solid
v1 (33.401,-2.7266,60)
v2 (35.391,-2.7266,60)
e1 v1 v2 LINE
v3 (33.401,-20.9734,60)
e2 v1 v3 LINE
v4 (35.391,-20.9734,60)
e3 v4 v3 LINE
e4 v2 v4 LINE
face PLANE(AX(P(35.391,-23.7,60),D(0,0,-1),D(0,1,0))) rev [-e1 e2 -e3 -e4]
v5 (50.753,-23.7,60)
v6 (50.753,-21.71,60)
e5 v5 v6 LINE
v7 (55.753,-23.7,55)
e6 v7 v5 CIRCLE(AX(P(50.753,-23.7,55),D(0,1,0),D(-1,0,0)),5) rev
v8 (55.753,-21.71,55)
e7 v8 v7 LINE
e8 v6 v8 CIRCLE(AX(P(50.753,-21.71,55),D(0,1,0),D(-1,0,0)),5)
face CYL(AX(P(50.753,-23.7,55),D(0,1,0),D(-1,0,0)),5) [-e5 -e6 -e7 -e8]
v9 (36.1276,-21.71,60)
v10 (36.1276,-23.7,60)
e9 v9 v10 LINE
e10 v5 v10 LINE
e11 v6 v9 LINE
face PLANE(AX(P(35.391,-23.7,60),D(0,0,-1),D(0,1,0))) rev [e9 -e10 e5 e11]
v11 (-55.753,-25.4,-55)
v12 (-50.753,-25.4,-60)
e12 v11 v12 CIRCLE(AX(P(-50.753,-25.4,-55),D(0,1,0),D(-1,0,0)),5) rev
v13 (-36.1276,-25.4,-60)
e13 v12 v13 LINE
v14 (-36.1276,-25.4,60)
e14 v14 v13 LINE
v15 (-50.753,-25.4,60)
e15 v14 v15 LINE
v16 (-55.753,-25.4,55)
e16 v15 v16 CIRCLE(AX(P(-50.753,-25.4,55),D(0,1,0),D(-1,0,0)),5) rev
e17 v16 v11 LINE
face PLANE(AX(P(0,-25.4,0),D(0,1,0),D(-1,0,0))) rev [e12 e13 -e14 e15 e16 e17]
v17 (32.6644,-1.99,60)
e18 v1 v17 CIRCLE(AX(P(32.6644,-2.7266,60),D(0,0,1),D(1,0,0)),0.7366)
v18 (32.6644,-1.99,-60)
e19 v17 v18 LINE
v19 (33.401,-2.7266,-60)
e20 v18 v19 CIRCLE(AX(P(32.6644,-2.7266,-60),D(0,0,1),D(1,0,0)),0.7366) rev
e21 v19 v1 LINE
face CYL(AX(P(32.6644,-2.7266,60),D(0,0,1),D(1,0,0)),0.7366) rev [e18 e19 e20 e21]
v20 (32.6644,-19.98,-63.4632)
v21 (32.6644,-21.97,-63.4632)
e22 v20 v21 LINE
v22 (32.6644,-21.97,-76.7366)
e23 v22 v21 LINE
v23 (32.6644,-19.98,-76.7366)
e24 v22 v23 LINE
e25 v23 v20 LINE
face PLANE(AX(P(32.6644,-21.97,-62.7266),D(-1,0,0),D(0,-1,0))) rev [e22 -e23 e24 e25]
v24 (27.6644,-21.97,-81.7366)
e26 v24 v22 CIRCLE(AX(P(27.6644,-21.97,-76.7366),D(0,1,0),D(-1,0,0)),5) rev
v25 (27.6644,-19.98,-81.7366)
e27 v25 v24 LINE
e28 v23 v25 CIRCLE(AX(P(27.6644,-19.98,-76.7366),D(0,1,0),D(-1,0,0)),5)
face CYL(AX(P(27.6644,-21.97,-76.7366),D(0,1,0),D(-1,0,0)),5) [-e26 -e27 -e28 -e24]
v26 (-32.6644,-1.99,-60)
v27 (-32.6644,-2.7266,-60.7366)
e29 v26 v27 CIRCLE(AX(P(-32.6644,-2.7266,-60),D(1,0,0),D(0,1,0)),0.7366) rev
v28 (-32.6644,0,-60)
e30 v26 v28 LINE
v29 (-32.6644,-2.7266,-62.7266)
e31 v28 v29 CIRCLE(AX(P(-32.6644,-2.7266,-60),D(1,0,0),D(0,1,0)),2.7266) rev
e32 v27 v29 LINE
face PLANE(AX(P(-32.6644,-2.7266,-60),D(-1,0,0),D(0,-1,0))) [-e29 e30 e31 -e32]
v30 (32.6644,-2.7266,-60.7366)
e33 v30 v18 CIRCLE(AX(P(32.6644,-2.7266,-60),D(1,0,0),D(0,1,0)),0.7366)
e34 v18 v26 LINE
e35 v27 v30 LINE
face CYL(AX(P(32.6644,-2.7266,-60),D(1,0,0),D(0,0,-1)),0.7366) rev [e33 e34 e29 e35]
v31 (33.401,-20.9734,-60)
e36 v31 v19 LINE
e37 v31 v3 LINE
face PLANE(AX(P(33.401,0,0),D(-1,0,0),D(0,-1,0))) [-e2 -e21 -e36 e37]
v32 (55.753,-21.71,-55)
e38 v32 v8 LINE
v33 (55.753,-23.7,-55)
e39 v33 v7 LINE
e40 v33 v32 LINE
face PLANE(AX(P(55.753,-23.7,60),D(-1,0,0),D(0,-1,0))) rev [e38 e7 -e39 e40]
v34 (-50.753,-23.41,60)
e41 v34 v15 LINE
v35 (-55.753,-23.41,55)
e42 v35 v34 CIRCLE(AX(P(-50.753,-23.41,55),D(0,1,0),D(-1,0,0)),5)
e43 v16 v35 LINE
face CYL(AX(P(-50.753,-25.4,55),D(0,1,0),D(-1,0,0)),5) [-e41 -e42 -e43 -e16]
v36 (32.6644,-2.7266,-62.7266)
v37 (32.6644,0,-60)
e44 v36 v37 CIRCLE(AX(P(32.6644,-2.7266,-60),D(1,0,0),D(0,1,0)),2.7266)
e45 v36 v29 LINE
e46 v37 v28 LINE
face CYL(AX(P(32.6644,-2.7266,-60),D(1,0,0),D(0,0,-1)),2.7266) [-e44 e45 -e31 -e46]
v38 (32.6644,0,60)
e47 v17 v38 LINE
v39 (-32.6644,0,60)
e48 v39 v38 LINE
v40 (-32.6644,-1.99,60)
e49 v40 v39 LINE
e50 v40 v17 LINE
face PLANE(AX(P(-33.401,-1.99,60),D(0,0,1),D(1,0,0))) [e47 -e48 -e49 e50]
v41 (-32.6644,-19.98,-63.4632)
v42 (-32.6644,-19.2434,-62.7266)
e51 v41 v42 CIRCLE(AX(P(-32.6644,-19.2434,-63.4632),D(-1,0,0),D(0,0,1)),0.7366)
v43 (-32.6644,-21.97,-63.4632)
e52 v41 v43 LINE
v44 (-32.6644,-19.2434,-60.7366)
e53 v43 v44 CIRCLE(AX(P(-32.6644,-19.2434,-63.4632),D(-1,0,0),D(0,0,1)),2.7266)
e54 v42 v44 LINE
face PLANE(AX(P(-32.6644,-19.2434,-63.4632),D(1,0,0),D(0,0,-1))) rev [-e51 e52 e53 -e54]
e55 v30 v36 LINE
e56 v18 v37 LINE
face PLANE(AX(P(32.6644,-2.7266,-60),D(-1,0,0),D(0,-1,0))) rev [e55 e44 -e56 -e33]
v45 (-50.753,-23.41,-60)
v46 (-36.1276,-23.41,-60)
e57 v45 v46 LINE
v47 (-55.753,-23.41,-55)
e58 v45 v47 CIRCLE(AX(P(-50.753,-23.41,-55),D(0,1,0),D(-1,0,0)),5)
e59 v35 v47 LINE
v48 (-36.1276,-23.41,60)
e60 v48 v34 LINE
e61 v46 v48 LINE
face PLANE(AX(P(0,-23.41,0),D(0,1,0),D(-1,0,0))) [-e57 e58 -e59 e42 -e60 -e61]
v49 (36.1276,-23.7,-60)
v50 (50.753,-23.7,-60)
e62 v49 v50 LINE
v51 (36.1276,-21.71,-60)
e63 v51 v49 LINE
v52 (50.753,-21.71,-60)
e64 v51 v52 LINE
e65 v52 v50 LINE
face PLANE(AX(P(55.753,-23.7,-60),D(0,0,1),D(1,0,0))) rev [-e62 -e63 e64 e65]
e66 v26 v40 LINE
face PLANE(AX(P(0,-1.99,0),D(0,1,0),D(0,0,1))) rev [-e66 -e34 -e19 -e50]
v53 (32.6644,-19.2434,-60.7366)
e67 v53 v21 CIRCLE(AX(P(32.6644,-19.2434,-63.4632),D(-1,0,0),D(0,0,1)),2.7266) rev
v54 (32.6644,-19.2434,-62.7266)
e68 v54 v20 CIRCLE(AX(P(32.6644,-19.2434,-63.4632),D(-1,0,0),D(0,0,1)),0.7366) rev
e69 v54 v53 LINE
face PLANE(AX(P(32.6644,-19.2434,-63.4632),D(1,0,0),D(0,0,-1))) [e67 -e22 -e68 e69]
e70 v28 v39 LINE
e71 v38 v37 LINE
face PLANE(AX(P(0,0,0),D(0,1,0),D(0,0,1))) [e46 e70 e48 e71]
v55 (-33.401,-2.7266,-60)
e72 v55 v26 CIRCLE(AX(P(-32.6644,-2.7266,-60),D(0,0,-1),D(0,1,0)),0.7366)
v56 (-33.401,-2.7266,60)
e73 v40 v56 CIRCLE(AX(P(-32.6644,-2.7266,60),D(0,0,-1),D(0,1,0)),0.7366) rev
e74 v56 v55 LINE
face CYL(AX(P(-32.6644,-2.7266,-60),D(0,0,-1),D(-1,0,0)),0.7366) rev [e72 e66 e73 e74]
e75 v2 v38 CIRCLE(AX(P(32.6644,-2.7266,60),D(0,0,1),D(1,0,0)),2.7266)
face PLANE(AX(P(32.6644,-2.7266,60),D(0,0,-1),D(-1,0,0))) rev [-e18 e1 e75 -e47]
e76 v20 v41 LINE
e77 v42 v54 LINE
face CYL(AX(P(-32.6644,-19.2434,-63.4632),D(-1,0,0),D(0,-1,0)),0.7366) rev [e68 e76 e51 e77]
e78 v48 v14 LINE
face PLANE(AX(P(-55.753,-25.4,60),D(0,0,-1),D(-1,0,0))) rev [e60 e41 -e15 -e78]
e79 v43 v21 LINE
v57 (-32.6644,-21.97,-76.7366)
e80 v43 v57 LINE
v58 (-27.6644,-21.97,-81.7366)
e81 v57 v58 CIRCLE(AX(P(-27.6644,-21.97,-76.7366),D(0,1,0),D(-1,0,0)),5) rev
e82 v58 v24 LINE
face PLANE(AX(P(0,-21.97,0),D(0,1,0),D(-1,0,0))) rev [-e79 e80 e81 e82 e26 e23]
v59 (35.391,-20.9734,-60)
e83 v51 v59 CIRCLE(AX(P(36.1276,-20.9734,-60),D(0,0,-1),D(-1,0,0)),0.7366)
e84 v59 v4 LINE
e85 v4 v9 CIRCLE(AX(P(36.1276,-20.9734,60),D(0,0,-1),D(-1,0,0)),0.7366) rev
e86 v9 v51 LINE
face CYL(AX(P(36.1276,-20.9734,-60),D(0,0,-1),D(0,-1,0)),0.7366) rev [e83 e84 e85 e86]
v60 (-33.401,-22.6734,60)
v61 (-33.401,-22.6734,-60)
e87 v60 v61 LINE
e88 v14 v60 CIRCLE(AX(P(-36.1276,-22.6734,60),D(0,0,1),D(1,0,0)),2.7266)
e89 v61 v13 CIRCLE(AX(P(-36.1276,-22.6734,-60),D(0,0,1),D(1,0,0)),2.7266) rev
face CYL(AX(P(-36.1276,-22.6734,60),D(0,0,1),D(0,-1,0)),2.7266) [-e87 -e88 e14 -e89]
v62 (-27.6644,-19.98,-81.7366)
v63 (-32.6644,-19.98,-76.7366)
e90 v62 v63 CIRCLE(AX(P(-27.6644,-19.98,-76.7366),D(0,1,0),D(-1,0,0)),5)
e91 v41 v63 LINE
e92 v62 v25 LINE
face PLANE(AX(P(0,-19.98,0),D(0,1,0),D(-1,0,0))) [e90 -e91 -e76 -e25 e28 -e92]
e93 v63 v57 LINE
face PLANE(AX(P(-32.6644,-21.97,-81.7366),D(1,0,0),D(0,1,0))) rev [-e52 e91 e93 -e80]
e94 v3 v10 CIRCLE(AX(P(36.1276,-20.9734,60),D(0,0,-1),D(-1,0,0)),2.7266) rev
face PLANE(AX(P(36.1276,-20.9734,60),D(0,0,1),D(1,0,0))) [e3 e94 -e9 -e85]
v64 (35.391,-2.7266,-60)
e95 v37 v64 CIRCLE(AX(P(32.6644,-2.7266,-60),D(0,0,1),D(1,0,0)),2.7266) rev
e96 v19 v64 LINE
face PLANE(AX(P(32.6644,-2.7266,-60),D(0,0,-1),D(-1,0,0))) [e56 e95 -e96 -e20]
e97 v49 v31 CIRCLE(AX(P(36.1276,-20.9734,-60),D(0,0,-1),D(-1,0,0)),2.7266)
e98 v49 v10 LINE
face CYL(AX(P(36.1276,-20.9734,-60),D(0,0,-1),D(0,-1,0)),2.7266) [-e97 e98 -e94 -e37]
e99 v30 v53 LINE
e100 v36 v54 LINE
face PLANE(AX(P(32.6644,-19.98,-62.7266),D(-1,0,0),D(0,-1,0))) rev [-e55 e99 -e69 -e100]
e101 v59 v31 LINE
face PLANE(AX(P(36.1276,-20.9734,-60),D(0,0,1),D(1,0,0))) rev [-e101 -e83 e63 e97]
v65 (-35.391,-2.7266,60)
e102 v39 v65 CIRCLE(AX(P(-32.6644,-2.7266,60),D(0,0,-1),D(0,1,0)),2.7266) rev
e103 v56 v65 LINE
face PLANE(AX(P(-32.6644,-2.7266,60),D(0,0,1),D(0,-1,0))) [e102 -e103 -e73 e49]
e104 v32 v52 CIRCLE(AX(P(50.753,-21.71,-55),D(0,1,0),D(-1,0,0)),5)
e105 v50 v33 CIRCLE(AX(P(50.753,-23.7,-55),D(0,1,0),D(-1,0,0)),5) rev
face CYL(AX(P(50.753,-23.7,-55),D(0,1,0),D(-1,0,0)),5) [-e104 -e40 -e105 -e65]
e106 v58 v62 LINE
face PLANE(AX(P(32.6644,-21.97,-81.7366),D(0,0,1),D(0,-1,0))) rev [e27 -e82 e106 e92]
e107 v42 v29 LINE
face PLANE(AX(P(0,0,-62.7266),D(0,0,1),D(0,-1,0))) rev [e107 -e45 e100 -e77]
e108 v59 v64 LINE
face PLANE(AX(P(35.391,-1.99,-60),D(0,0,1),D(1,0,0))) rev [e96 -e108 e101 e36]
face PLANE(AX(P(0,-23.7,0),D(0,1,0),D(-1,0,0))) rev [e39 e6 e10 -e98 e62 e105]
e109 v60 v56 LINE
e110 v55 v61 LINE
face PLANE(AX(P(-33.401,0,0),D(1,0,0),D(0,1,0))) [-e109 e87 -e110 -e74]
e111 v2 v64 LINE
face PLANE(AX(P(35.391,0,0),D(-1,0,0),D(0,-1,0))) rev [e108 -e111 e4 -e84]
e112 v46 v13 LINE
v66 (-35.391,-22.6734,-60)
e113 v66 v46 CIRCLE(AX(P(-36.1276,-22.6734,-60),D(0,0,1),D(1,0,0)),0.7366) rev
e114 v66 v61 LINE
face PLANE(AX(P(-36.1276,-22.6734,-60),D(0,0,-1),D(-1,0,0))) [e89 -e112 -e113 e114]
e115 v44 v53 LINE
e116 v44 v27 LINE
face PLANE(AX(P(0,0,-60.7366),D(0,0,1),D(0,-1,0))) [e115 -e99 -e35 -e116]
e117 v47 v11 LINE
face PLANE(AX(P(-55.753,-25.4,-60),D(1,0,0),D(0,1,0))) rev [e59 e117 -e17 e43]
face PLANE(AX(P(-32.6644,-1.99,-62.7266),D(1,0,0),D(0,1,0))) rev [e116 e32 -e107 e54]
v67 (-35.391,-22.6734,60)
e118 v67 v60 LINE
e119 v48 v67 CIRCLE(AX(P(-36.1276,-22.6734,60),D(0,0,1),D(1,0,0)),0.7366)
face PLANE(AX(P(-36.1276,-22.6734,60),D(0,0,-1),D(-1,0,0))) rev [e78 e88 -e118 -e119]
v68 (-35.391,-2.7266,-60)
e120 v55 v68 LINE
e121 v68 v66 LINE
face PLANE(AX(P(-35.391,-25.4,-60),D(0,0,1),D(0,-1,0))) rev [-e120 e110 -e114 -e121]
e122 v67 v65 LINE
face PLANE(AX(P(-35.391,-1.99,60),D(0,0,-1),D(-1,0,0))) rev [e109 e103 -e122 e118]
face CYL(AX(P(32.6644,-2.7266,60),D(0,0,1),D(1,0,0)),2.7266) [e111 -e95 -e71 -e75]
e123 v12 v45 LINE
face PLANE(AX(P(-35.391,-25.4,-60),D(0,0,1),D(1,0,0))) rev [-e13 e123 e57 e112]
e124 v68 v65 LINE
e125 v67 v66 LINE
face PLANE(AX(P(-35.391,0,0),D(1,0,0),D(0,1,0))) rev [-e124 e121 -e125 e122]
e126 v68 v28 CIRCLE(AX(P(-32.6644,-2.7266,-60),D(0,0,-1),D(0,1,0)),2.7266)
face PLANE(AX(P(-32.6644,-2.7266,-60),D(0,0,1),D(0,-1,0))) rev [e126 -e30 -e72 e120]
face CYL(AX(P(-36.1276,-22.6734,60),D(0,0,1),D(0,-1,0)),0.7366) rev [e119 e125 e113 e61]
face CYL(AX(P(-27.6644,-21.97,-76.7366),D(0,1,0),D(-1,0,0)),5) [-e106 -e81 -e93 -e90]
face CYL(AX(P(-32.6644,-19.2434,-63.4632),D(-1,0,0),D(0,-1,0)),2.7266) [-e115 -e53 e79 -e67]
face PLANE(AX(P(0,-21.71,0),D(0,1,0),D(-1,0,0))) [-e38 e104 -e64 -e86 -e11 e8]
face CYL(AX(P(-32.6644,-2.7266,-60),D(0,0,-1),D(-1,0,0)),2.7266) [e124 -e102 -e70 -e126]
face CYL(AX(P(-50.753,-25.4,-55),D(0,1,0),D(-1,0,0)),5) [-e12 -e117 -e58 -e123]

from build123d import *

# Parameters (mm, degrees)
SKETCH3_W                    = 66.802
SKETCH3_H                    = 120
BASE_FLANGE1_DEPTH           = 1.99
EDGE_FLANGE1_STRIP_W         = 9.4332
EDGE_FLANGE1_STRIP_H         = 1.99
EDGE_FLANGE1_STRIP_CUT_DEPTH = 120
EDGE_FLANGE1_DEPTH           = 120
EDGE_FLANGE2_STRIP_W         = 9.4332
EDGE_FLANGE2_STRIP_H         = 1.99
EDGE_FLANGE2_STRIP_CUT_DEPTH = 120
EDGE_FLANGE2_DEPTH           = 120
EDGE_FLANGE3_STRIP_W         = 9.4332
EDGE_FLANGE3_STRIP_H         = 1.99
EDGE_FLANGE3_STRIP_CUT_DEPTH = 120
EDGE_FLANGE3_DEPTH           = 120
EDGE_FLANGE4_STRIP_W         = 9.4332
EDGE_FLANGE4_STRIP_H         = 1.99
EDGE_FLANGE4_STRIP_CUT_DEPTH = 120
EDGE_FLANGE4_DEPTH           = 120
EDGE_FLANGE6_DEPTH           = 65.3288
EDGE_FLANGE7_STRIP_W         = 9.4332
EDGE_FLANGE7_STRIP_H         = 1.99
EDGE_FLANGE7_STRIP_CUT_DEPTH = 65.3288
EDGE_FLANGE7_DEPTH           = 65.3288
FILLET1_R                    = 5


# Sheet-metal steps are written as plain solids
with BuildPart() as part:
    # Sketch3 → Base-Flange1 (new body)
    with BuildSketch(Plane(origin=(0, 0, 0), x_dir=(1, 0, 0), z_dir=(0, 1, 0))):
        Rectangle(SKETCH3_W, SKETCH3_H)
    extrude(amount=-BASE_FLANGE1_DEPTH)

    # Edge-Flange1 strip (across the edge) → Edge-Flange1 strip cut (cut)
    with BuildSketch(Plane(origin=(33.401, -1.99, -60), x_dir=(-1, 0, 0), z_dir=(0, 0, 1))):
        with Locations((-3.98, -0.995)):
            Rectangle(EDGE_FLANGE1_STRIP_W, EDGE_FLANGE1_STRIP_H)
    extrude(amount=EDGE_FLANGE1_STRIP_CUT_DEPTH, mode=Mode.SUBTRACT)

    # Edge-Flange1 section (across the edge) → Edge-Flange1 (add)
    with BuildSketch(Plane(origin=(33.401, -1.99, -60), x_dir=(-1, 0, 0), z_dir=(0, 0, 1))):
        with BuildLine():
            Line((-1.99, 0.7366), (-1.99, 21.71))
            Line((-1.99, 21.71), (0, 21.71))
            Line((0, 21.71), (0, 0.7366))
            ThreePointArc((0, 0.7366), (0.215745145, 0.215745145), (0.7366, 0))
            Line((0.7366, 0), (0.7366, -1.99))
            ThreePointArc((0.7366, -1.99), (-1.19139735, -1.19139735), (-1.99, 0.7366))
        make_face()
    extrude(amount=EDGE_FLANGE1_DEPTH)

    # Edge-Flange2 strip (across the edge) → Edge-Flange2 strip cut (cut)
    with BuildSketch(Plane(origin=(-33.401, -1.99, 60), x_dir=(1, 0, 0), z_dir=(0, 0, -1))):
        with Locations((-3.98, -0.995)):
            Rectangle(EDGE_FLANGE2_STRIP_W, EDGE_FLANGE2_STRIP_H)
    extrude(amount=EDGE_FLANGE2_STRIP_CUT_DEPTH, mode=Mode.SUBTRACT)

    # Edge-Flange2 section (across the edge) → Edge-Flange2 (add)
    with BuildSketch(Plane(origin=(-33.401, -1.99, 60), x_dir=(1, 0, 0), z_dir=(0, 0, -1))):
        with BuildLine():
            Line((-1.99, 0.7366), (-1.99, 23.41))
            Line((-1.99, 23.41), (0, 23.41))
            Line((0, 23.41), (0, 0.7366))
            ThreePointArc((0, 0.7366), (0.215745145, 0.215745145), (0.7366, 0))
            Line((0.7366, 0), (0.7366, -1.99))
            ThreePointArc((0.7366, -1.99), (-1.19139735, -1.19139735), (-1.99, 0.7366))
        make_face()
    extrude(amount=EDGE_FLANGE2_DEPTH)

    # Edge-Flange3 strip (across the edge) → Edge-Flange3 strip cut (cut)
    with BuildSketch(Plane(origin=(35.391, -23.7, 60), x_dir=(0, 1, 0), z_dir=(0, 0, -1))):
        with Locations((-1.99, -0.995)):
            Rectangle(EDGE_FLANGE3_STRIP_W, EDGE_FLANGE3_STRIP_H)
    extrude(amount=EDGE_FLANGE3_STRIP_CUT_DEPTH, mode=Mode.SUBTRACT)

    # Edge-Flange3 section (across the edge) → Edge-Flange3 (add)
    with BuildSketch(Plane(origin=(35.391, -23.7, 60), x_dir=(0, 1, 0), z_dir=(0, 0, -1))):
        with BuildLine():
            Line((0, 0.7366), (0, 20.362))
            Line((0, 20.362), (1.99, 20.362))
            Line((1.99, 20.362), (1.99, 0.7366))
            ThreePointArc((1.99, 0.7366), (2.205745145, 0.215745145), (2.7266, 0))
            Line((2.7266, 0), (2.7266, -1.99))
            ThreePointArc((2.7266, -1.99), (0.79860265, -1.19139735), (0, 0.7366))
        make_face()
    extrude(amount=EDGE_FLANGE3_DEPTH)

    # Edge-Flange4 strip (across the edge) → Edge-Flange4 strip cut (cut)
    with BuildSketch(Plane(origin=(-35.391, -25.4, -60), x_dir=(0, 1, 0), z_dir=(0, 0, 1))):
        with Locations((-1.99, -0.995)):
            Rectangle(EDGE_FLANGE4_STRIP_W, EDGE_FLANGE4_STRIP_H)
    extrude(amount=EDGE_FLANGE4_STRIP_CUT_DEPTH, mode=Mode.SUBTRACT)

    # Edge-Flange4 section (across the edge) → Edge-Flange4 (add)
    with BuildSketch(Plane(origin=(-35.391, -25.4, -60), x_dir=(0, 1, 0), z_dir=(0, 0, 1))):
        with BuildLine():
            Line((0, 0.7366), (0, 20.362))
            Line((0, 20.362), (1.99, 20.362))
            Line((1.99, 20.362), (1.99, 0.7366))
            ThreePointArc((1.99, 0.7366), (2.205745145, 0.215745145), (2.7266, 0))
            Line((2.7266, 0), (2.7266, -1.99))
            ThreePointArc((2.7266, -1.99), (0.79860265, -1.19139735), (0, 0.7366))
        make_face()
    extrude(amount=EDGE_FLANGE4_DEPTH)

    # Edge-Flange6 section (across the edge) → Edge-Flange6 (add)
    with BuildSketch(Plane(origin=(-32.6644, -1.99, -60.7366), x_dir=(0, 0, 1), z_dir=(1, 0, 0))):
        with BuildLine():
            Line((-1.99, 0.7366), (-1.99, 17.99))
            Line((-1.99, 17.99), (0, 17.99))
            Line((0, 17.99), (0, 0.7366))
            ThreePointArc((0, 0.7366), (0.215745145, 0.215745145), (0.7366, 0))
            Line((0.7366, 0), (0.7366, -1.99))
            ThreePointArc((0.7366, -1.99), (-1.19139735, -1.19139735), (-1.99, 0.7366))
        make_face()
    extrude(amount=EDGE_FLANGE6_DEPTH)

    # Edge-Flange7 strip (across the edge) → Edge-Flange7 strip cut (cut)
    with BuildSketch(Plane(origin=(32.6644, -19.98, -62.7266), x_dir=(0, 1, 0), z_dir=(-1, 0, 0))):
        with Locations((-3.98, -0.995)):
            Rectangle(EDGE_FLANGE7_STRIP_W, EDGE_FLANGE7_STRIP_H)
    extrude(amount=EDGE_FLANGE7_STRIP_CUT_DEPTH, mode=Mode.SUBTRACT)

    # Edge-Flange7 section (across the edge) → Edge-Flange7 (add)
    with BuildSketch(Plane(origin=(32.6644, -19.98, -62.7266), x_dir=(0, 1, 0), z_dir=(-1, 0, 0))):
        with BuildLine():
            Line((-1.99, 0.7366), (-1.99, 19.01))
            Line((-1.99, 19.01), (0, 19.01))
            Line((0, 19.01), (0, 0.7366))
            ThreePointArc((0, 0.7366), (0.215745145, 0.215745145), (0.7366, 0))
            Line((0.7366, 0), (0.7366, -1.99))
            ThreePointArc((0.7366, -1.99), (-1.19139735, -1.19139735), (-1.99, 0.7366))
        make_face()
    extrude(amount=EDGE_FLANGE7_DEPTH)

    # Fillet1
    fillet1_edges = [part.edges().sort_by_distance(p)[0] for p in [
        (55.753, -22.705, 60),
        (55.753, -22.705, -60),
        (-55.753, -24.405, -60),
        (-55.753, -24.405, 60),
        (32.6644, -20.975, -81.7366),
        (-32.6644, -20.975, -81.7366),
    ]]
    fillet(fillet1_edges, radius=FILLET1_R)


solid = part.part
